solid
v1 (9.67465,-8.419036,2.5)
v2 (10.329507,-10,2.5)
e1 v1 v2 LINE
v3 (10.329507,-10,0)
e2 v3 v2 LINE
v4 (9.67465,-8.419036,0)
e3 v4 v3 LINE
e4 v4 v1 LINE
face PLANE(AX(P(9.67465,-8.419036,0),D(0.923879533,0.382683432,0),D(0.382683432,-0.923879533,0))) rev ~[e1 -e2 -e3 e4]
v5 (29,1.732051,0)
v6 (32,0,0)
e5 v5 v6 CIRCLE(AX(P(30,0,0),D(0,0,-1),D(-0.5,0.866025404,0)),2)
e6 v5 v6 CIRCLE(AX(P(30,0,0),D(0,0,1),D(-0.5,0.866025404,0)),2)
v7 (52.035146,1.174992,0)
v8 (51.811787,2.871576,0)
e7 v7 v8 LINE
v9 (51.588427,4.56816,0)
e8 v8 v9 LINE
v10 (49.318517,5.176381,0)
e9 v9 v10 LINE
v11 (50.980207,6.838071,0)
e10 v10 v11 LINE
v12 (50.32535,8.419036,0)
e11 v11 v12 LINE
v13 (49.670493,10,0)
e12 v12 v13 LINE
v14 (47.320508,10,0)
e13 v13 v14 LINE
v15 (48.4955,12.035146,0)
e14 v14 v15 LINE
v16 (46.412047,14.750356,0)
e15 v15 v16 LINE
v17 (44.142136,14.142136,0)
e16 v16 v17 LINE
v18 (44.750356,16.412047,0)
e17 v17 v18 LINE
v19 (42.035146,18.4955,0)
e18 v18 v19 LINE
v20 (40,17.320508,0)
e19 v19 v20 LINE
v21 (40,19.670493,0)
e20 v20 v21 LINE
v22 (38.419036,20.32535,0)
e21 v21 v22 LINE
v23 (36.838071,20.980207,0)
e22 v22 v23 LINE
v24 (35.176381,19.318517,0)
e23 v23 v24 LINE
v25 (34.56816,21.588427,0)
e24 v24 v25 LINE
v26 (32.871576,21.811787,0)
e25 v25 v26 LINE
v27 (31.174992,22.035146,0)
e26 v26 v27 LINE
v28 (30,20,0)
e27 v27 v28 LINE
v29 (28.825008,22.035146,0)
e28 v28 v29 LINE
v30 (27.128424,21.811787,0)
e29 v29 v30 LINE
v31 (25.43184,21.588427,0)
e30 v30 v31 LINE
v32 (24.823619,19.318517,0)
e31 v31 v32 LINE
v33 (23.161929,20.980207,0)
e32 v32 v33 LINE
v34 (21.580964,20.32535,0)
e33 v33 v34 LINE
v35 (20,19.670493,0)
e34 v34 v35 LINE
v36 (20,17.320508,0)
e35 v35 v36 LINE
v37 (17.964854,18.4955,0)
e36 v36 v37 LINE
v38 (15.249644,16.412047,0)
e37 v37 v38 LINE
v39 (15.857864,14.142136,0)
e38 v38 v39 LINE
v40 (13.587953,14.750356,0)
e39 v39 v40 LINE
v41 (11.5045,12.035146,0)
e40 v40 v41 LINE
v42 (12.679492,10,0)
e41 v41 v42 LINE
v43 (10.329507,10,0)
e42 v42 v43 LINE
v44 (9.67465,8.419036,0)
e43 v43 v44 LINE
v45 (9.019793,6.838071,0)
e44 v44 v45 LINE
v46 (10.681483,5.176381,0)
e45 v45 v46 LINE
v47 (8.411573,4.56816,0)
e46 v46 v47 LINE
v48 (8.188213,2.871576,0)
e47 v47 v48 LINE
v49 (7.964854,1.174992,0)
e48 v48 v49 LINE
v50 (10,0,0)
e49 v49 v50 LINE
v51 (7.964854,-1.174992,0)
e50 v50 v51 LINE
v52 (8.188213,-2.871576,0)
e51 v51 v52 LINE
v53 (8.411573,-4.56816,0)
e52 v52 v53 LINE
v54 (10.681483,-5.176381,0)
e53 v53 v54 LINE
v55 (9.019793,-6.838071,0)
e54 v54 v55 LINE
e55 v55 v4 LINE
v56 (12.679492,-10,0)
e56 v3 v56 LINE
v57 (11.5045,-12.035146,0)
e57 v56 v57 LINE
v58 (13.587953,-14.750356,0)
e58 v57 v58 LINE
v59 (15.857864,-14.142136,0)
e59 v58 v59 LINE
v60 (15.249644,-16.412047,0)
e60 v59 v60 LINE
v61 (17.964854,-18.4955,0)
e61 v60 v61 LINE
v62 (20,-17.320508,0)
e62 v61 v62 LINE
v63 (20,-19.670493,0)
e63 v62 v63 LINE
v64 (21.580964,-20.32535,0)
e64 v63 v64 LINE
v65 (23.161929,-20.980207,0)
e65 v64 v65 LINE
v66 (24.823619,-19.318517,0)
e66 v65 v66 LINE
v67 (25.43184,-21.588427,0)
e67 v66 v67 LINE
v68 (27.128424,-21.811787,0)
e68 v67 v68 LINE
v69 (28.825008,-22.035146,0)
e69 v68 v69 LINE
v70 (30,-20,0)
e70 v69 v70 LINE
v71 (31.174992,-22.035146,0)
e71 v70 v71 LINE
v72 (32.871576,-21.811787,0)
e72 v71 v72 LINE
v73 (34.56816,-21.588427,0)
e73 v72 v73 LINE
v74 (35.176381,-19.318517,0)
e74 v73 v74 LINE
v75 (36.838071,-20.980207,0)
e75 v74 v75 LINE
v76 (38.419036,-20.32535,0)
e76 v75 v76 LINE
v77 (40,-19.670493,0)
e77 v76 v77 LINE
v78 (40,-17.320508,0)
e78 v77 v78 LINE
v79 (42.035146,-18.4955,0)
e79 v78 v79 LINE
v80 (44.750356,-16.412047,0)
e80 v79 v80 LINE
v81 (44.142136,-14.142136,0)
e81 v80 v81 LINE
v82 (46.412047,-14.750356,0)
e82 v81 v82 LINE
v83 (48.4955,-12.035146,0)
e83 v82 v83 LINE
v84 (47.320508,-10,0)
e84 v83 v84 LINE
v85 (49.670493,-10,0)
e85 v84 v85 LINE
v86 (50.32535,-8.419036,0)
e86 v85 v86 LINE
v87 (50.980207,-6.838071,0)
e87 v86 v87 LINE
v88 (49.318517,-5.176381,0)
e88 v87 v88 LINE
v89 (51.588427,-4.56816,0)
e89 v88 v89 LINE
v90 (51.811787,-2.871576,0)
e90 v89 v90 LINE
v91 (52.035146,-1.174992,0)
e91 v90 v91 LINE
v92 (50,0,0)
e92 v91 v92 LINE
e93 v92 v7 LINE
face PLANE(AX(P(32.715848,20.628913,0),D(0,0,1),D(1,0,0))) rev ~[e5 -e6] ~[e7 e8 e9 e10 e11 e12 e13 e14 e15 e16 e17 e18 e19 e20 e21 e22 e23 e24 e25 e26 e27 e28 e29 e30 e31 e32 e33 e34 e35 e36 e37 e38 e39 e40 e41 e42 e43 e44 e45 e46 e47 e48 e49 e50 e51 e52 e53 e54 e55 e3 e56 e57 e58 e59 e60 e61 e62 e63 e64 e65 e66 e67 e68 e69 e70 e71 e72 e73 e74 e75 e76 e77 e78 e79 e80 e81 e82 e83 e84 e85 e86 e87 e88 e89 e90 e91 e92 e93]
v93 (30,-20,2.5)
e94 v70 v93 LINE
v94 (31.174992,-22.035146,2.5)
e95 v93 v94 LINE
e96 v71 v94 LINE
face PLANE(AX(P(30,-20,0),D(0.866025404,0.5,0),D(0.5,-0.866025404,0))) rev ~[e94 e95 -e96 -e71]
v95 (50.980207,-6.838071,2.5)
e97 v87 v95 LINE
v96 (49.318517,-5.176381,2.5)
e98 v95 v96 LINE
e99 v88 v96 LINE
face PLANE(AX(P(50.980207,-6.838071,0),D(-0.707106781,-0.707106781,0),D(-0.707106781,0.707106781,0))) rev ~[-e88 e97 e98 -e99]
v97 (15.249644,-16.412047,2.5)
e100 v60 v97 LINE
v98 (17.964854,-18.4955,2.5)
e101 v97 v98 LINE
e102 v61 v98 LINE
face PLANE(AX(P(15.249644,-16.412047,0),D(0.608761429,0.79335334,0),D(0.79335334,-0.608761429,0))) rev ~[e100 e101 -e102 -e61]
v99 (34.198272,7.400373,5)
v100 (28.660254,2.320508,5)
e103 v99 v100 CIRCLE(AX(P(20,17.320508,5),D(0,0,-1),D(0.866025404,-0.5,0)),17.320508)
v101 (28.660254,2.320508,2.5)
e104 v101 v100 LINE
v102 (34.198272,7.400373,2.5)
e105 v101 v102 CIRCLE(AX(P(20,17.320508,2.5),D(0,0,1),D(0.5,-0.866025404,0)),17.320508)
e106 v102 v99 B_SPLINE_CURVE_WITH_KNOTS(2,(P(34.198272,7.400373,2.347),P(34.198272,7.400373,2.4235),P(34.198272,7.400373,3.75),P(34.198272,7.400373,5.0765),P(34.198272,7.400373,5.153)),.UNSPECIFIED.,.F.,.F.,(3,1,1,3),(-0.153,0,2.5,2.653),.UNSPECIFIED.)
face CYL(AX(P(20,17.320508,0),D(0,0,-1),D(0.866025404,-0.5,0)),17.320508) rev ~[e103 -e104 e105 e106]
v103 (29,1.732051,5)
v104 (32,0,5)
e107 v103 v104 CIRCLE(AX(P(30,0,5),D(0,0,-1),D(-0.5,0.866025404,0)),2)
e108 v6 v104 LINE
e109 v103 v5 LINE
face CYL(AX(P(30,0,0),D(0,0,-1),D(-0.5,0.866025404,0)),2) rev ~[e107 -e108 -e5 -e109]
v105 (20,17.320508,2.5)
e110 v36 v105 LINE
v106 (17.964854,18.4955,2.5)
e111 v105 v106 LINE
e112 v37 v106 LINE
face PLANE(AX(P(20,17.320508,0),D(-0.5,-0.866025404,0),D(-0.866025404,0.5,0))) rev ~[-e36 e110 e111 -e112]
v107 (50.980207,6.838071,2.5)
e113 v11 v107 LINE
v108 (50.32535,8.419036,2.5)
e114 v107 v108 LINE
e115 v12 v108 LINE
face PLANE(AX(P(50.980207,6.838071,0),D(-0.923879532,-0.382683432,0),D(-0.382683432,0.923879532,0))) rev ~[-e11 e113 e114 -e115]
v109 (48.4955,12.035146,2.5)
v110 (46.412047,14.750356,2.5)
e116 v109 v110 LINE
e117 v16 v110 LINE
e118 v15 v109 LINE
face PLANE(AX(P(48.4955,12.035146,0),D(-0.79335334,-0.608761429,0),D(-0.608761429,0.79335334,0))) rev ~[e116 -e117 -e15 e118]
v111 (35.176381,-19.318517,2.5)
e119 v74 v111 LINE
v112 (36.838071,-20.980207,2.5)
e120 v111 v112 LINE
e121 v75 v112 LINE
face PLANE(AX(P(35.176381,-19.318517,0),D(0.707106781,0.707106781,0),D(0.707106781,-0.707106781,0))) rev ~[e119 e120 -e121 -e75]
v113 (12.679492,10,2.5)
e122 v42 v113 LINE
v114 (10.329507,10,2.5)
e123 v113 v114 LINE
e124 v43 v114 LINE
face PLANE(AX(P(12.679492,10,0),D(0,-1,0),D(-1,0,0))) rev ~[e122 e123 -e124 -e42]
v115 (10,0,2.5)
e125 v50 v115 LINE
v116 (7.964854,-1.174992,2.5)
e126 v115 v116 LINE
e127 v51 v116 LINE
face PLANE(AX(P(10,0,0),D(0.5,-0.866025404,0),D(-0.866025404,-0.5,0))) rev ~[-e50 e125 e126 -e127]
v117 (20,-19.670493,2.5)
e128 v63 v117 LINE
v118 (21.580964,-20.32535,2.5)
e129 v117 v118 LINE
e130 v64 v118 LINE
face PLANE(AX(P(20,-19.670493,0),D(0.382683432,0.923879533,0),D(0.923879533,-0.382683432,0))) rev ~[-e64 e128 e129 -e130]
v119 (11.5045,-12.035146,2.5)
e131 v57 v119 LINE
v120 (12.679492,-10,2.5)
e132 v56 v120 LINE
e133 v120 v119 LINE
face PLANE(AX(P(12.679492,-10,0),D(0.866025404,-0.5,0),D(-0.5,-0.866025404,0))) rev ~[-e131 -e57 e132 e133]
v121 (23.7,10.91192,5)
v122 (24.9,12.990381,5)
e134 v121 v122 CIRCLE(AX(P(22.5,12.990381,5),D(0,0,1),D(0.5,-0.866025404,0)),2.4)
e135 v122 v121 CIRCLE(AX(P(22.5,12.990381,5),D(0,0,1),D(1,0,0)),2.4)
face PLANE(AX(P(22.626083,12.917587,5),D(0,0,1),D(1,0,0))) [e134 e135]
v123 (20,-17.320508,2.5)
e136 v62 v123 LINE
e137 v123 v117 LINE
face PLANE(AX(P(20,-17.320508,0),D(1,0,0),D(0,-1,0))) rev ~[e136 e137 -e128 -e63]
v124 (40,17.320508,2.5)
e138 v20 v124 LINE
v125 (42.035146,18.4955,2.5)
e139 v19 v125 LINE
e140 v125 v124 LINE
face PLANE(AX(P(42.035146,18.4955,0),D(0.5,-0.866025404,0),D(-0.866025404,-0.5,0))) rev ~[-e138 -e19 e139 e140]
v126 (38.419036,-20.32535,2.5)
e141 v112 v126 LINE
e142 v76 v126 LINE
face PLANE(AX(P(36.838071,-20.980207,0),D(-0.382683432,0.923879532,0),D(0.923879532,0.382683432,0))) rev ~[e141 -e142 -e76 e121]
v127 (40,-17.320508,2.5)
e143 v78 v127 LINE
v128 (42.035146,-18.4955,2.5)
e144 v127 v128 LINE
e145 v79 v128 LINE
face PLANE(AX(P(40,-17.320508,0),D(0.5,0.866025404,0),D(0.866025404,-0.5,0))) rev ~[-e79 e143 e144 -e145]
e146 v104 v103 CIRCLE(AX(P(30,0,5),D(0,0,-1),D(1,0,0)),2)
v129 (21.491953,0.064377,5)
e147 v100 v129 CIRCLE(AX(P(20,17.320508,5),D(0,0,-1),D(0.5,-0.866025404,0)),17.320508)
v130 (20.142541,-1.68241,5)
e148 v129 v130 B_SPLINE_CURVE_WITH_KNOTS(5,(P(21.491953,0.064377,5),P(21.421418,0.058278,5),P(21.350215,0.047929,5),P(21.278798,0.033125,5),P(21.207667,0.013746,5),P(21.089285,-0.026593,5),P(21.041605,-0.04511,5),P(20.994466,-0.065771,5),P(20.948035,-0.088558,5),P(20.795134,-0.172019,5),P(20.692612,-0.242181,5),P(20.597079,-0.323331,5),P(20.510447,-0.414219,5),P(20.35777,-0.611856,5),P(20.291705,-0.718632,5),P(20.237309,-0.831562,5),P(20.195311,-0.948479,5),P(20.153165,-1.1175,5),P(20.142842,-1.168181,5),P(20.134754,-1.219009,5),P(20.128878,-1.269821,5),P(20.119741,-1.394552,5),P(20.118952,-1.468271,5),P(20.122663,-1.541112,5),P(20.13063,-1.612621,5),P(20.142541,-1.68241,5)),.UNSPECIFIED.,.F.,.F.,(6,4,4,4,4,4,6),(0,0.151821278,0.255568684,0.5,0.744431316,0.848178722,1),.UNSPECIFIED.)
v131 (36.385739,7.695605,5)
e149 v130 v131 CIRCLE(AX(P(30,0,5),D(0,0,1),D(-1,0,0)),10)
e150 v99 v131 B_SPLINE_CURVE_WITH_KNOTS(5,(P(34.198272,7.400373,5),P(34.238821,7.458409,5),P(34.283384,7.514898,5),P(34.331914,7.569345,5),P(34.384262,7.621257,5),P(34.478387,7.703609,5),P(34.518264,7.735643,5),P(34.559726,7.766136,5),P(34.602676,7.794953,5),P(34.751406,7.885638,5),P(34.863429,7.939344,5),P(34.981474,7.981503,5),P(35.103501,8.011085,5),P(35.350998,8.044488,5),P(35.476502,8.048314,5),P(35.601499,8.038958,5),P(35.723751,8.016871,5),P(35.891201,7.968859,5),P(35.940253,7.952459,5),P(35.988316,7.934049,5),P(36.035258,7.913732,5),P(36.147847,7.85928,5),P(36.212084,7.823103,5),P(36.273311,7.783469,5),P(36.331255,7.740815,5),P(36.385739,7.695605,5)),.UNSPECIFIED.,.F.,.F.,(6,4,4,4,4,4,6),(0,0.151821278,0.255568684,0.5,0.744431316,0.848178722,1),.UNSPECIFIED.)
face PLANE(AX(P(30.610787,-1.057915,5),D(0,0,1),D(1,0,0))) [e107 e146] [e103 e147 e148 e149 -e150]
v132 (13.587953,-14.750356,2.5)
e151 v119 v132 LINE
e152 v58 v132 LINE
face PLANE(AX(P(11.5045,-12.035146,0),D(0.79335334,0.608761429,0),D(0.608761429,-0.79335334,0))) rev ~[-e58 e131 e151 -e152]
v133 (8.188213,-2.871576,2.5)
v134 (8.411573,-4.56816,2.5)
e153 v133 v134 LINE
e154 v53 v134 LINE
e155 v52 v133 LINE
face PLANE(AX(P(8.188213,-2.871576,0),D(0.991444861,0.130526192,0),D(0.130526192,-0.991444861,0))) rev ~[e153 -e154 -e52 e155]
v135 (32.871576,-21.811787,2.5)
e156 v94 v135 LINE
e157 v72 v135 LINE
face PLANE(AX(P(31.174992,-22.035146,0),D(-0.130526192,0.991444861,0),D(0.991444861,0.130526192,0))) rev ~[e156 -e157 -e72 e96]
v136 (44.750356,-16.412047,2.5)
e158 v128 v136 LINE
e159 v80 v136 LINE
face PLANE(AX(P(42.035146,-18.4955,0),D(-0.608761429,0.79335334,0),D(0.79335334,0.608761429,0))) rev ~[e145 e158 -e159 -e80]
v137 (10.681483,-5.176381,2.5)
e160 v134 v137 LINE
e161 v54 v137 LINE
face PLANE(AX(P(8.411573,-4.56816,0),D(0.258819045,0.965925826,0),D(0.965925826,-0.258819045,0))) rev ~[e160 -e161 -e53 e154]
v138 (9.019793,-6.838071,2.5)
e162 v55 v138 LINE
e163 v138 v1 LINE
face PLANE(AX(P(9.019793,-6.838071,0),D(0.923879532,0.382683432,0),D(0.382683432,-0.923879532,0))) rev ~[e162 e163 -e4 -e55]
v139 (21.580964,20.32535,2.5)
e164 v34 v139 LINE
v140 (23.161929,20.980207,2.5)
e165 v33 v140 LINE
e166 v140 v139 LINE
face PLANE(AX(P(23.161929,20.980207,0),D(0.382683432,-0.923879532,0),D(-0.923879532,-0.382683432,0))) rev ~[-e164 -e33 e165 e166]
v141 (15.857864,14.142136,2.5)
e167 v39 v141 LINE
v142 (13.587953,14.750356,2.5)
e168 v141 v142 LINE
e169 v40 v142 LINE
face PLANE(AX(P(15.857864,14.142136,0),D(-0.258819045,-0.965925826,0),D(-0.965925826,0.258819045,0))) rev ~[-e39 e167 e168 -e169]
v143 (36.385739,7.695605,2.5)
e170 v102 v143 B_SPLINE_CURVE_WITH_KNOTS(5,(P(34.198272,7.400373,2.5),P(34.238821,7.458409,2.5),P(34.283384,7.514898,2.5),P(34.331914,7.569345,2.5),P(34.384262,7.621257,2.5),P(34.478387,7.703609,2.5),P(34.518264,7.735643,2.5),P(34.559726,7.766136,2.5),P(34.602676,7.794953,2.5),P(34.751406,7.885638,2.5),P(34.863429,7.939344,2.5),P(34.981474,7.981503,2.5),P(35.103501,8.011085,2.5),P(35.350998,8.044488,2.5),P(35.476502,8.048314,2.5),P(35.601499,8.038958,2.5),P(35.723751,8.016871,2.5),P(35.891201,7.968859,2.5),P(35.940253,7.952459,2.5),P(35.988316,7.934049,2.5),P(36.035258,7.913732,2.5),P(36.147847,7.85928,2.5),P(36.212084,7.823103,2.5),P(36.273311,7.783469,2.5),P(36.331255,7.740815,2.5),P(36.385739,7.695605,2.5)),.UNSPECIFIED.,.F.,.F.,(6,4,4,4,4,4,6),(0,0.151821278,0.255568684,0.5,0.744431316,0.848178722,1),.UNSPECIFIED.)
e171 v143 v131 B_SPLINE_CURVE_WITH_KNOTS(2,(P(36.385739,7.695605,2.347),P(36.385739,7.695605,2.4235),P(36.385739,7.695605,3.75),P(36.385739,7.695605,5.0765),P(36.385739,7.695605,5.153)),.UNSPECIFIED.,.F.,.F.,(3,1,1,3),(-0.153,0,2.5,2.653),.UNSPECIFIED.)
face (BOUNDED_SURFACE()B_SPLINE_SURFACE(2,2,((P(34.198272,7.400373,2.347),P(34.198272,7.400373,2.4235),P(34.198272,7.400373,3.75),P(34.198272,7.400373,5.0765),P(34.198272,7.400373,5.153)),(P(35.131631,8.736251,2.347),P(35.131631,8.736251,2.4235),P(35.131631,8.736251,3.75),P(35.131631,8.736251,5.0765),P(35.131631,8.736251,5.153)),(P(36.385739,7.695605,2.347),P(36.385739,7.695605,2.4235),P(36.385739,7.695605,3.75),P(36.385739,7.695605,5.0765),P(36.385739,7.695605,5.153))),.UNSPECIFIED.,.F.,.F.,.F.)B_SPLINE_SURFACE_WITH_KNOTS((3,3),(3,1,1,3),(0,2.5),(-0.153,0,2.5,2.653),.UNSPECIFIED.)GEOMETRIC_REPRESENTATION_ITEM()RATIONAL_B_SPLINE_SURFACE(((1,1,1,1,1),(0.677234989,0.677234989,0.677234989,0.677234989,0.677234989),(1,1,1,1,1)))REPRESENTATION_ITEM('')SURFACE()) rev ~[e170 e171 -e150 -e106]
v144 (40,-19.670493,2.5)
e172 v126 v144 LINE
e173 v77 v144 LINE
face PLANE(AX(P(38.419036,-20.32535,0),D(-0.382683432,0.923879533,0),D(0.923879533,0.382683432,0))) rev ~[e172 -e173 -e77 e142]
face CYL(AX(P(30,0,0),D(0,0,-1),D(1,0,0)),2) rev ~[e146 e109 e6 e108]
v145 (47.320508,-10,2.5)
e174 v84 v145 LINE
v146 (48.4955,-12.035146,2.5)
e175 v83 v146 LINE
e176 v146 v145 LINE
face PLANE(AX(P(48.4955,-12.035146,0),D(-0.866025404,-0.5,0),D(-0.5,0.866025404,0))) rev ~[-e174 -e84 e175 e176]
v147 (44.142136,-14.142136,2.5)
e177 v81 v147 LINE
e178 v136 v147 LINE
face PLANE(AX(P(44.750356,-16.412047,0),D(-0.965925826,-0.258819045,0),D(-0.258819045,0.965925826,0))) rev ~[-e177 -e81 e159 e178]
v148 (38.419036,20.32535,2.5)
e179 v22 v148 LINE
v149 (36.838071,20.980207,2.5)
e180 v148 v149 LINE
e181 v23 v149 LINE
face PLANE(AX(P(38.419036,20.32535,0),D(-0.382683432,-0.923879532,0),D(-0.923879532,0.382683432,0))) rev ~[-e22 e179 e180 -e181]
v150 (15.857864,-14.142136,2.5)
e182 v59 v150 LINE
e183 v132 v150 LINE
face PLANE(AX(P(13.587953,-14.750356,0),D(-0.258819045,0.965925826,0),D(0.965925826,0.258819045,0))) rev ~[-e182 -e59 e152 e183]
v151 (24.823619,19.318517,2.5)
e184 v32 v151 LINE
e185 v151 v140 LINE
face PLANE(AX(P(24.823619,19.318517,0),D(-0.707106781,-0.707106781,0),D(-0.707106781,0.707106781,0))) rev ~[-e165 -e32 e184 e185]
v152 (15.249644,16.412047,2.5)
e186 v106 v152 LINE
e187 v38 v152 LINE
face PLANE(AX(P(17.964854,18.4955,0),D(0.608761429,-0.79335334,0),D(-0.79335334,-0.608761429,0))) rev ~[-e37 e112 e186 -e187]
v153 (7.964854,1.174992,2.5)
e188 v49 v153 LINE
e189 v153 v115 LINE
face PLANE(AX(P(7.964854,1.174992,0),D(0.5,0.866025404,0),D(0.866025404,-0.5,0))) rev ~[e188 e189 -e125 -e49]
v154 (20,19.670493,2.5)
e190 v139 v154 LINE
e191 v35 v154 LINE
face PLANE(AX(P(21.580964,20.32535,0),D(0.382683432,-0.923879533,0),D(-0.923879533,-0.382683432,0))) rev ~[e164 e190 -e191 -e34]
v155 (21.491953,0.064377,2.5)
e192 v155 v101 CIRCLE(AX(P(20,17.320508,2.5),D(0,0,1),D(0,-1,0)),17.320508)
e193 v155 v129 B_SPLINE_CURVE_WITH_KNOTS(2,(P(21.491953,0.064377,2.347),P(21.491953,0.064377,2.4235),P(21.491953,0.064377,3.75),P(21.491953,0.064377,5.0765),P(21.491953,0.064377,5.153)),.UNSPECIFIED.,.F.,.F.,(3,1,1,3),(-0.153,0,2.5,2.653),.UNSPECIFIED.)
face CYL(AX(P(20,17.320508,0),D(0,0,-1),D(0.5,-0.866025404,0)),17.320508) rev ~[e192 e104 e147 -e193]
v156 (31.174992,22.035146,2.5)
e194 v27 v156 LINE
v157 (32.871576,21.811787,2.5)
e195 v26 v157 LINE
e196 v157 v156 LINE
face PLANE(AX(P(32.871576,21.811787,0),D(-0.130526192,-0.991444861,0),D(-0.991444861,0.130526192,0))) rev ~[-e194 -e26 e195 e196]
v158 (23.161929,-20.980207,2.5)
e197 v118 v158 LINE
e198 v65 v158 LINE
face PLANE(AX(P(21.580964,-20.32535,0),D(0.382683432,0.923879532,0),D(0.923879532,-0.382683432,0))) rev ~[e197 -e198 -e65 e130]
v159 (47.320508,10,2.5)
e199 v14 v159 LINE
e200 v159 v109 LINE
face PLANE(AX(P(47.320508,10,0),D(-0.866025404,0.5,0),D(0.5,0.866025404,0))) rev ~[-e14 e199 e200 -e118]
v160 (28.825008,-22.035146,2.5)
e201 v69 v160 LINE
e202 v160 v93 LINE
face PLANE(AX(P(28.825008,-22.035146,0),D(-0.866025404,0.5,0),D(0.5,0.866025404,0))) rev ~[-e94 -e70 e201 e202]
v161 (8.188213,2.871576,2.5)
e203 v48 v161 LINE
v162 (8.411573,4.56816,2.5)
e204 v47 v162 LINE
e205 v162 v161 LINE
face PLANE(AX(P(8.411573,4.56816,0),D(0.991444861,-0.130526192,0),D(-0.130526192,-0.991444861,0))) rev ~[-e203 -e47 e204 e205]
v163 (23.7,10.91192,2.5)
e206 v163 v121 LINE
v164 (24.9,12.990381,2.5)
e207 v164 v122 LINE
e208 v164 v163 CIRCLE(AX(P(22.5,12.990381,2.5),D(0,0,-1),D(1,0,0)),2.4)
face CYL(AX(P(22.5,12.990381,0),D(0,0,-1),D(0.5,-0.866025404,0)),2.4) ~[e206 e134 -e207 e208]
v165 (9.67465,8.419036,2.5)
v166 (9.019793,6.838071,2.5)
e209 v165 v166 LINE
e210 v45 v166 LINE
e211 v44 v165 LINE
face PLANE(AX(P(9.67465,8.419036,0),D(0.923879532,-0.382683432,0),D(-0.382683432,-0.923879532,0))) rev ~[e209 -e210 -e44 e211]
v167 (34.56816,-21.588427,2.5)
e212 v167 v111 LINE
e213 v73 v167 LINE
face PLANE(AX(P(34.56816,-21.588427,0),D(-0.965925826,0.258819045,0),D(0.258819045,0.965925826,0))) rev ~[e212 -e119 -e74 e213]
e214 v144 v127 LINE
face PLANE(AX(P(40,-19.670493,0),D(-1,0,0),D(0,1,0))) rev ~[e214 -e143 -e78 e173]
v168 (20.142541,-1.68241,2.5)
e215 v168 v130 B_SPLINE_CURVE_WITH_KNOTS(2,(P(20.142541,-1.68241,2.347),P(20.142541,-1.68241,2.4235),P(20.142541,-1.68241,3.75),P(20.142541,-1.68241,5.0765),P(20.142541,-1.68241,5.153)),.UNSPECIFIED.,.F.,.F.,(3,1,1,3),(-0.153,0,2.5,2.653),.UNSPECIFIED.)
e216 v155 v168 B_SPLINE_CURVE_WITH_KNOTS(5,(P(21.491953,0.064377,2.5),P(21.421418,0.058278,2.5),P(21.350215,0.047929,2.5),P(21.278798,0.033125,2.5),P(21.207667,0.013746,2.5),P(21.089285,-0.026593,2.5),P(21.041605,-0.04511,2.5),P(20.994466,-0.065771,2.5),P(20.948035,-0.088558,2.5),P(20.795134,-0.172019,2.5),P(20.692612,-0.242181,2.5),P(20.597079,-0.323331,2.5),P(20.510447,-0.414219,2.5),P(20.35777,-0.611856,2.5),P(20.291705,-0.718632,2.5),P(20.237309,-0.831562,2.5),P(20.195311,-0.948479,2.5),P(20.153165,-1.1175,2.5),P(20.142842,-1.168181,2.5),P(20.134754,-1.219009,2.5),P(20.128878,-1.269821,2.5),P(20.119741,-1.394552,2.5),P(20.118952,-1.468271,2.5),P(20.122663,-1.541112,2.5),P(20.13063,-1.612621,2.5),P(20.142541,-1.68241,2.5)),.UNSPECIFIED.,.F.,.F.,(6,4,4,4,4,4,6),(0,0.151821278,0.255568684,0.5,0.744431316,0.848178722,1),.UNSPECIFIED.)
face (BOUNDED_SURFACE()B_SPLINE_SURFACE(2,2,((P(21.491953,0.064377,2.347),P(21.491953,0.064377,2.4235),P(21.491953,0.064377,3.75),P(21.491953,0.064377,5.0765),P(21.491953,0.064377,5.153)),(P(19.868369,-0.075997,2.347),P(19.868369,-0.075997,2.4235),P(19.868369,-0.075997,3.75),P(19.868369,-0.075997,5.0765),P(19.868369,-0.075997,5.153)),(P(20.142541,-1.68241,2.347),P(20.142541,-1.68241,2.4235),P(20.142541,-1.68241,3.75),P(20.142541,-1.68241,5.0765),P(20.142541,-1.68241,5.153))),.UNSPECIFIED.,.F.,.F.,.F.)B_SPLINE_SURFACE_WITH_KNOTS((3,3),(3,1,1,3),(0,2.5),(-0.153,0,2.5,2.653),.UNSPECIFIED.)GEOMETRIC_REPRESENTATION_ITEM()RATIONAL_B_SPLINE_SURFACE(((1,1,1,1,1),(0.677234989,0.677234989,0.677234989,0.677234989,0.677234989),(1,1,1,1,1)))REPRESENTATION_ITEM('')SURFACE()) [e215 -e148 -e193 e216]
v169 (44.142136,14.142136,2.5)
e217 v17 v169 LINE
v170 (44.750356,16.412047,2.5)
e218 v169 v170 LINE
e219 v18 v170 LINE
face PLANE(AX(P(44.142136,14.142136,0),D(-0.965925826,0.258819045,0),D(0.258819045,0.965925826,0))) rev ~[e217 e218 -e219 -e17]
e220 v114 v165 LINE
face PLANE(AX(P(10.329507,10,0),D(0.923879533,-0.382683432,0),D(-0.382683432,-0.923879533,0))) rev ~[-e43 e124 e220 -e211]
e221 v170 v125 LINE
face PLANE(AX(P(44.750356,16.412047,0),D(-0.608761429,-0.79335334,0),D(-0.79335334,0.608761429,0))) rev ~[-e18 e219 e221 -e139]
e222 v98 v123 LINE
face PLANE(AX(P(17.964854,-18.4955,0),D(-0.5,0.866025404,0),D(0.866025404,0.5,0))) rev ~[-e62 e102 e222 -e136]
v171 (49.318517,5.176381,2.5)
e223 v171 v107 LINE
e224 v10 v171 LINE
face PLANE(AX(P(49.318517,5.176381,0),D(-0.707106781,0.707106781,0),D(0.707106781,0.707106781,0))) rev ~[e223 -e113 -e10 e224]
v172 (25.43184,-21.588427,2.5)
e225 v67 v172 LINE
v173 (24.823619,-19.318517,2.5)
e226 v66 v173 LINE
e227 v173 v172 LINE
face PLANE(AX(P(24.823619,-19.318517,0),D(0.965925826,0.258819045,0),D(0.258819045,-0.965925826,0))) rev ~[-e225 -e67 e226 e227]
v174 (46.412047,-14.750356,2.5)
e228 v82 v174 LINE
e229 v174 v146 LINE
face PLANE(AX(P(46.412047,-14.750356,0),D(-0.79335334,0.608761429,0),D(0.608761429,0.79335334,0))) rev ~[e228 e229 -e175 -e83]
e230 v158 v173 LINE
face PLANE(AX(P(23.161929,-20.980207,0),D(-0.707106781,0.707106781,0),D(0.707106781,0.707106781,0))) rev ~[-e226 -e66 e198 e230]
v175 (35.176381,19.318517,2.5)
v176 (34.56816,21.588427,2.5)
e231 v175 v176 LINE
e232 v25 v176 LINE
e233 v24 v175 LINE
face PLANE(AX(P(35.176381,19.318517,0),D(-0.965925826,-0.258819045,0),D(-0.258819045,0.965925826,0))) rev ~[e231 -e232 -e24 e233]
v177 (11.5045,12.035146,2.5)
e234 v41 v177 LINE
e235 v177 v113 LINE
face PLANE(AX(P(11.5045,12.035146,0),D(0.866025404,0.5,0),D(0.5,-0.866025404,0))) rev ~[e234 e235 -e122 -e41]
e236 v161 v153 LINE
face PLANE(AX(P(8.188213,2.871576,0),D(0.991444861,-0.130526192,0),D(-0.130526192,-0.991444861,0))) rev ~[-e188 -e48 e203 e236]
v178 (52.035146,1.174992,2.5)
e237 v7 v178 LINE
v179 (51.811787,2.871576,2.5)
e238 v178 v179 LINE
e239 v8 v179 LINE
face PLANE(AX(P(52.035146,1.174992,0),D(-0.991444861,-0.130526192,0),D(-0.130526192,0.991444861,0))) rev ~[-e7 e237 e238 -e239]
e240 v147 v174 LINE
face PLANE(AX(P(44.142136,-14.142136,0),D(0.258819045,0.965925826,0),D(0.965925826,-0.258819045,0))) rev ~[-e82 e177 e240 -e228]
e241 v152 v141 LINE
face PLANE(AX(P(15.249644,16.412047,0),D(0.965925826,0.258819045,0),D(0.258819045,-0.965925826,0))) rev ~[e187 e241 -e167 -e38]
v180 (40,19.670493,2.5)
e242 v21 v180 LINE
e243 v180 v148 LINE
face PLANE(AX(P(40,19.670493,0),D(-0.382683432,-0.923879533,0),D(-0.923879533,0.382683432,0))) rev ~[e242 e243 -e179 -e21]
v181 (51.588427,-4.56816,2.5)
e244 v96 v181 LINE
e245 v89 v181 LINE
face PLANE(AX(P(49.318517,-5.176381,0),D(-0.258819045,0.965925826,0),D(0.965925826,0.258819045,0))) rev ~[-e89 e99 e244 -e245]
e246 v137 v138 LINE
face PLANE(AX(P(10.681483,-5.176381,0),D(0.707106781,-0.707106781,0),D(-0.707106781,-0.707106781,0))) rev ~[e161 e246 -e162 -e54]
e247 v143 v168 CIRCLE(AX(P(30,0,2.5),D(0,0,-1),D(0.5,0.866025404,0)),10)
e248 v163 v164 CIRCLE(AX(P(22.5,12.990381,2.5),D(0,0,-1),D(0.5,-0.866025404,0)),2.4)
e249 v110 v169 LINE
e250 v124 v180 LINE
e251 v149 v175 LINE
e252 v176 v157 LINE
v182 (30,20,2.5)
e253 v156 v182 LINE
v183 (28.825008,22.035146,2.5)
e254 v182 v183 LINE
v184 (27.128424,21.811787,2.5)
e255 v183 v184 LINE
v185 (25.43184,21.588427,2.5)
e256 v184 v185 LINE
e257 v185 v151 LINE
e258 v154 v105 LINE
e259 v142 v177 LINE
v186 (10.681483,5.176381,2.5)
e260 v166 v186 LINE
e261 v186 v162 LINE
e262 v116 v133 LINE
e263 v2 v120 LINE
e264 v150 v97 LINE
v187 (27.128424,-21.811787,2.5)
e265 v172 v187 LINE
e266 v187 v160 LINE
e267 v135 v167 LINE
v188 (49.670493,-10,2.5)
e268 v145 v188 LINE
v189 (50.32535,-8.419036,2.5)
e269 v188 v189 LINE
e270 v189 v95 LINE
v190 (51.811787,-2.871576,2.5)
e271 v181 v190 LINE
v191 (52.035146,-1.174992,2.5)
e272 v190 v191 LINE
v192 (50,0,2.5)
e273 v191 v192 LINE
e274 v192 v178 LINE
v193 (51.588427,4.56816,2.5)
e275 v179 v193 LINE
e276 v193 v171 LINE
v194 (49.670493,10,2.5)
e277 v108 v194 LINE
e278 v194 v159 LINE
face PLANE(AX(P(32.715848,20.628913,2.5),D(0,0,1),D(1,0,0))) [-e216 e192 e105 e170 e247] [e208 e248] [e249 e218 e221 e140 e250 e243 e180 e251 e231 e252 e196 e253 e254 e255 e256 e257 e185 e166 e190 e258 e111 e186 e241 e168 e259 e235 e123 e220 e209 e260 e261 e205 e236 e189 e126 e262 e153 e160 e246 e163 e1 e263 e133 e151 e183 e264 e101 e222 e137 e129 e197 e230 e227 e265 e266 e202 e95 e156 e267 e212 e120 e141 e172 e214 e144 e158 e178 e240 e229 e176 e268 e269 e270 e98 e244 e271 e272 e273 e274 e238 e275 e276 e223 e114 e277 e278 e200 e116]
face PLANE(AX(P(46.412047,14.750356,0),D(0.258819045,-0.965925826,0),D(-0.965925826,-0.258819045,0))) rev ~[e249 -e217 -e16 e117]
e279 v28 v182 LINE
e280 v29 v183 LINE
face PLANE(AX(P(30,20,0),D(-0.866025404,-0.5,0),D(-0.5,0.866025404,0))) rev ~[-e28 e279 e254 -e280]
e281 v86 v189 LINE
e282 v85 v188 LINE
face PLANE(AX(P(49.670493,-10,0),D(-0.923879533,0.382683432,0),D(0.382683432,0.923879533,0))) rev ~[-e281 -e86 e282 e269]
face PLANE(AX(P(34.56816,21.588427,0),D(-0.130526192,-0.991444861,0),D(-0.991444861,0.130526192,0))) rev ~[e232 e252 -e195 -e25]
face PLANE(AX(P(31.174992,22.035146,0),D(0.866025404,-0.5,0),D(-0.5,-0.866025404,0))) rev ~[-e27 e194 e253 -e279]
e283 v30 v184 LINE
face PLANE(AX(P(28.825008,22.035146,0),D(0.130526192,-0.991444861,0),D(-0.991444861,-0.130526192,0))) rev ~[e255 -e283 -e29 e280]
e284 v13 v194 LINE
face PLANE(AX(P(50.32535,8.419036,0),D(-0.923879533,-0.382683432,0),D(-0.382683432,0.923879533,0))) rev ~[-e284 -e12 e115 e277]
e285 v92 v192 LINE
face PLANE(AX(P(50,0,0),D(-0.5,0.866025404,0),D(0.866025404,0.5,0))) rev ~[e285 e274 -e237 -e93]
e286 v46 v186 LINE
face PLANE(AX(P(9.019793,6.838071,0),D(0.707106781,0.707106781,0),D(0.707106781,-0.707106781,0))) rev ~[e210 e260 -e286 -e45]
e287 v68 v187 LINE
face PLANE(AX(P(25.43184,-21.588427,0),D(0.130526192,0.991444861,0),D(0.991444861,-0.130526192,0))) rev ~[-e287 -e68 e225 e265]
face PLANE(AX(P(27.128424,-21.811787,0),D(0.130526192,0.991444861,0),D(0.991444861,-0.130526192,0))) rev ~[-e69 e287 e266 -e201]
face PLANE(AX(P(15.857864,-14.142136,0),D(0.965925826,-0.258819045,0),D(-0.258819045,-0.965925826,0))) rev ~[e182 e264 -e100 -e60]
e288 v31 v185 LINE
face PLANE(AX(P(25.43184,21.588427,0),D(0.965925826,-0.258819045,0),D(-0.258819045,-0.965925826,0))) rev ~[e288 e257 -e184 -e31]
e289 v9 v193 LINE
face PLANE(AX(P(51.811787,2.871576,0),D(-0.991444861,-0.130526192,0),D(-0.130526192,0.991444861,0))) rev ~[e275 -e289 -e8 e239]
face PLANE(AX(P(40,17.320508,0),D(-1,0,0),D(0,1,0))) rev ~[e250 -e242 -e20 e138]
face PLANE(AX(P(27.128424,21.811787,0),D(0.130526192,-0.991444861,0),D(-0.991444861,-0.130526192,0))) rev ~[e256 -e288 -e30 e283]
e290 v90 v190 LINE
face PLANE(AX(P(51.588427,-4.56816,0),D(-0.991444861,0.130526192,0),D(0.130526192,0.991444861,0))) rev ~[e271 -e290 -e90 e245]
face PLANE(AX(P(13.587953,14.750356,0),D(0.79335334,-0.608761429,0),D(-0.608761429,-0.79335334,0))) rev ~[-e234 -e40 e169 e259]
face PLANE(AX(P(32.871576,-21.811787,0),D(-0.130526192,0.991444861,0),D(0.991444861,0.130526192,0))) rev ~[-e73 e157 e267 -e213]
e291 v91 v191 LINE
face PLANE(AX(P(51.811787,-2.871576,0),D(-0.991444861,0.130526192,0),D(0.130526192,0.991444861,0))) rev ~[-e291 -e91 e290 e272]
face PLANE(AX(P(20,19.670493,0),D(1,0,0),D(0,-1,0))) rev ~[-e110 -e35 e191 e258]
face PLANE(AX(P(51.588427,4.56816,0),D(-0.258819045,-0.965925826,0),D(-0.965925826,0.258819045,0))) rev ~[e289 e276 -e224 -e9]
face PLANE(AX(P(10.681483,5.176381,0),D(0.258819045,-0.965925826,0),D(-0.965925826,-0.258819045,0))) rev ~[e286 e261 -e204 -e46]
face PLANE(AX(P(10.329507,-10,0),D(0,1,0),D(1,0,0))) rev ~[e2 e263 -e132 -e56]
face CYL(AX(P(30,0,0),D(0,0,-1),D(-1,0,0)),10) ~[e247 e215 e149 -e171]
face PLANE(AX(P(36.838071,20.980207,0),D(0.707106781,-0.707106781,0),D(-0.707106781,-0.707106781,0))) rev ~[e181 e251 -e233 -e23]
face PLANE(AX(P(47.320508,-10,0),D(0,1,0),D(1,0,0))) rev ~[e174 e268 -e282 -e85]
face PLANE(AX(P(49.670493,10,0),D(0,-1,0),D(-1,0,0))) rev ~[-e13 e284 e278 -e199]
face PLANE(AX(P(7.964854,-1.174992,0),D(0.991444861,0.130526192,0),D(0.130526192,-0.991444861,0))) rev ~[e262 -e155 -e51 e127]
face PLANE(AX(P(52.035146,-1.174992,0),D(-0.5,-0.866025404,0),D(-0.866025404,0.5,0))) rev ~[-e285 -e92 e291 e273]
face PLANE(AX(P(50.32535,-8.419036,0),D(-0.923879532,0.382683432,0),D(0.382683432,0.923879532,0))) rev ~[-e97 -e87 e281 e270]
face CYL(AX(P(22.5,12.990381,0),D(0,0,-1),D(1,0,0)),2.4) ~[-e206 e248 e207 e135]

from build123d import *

# Parameters (mm, degrees)
F0_R     = 20
F2_DEPTH = 2.5
F3_DEPTH = 5
F4_DEPTH = 2.5
F5_R     = 1.5


with BuildPart() as f2:
    # F0 (on Top) → F2 (new body)
    with BuildSketch(Plane.XY):
        with Locations((30, 0)):
            Circle(F0_R)
        with BuildLine():
            ThreePointArc((20, 0), (24.4828773608, 0.5901820009), (28.6602540378, 2.3205080757))
            ThreePointArc((28.6602540378, 2.3205080757), (32.2474487139, 5.0730593618), (35, 8.6602540378))
            ThreePointArc((35, 8.6602540378), (35, -8.6602540378), (20, 0))
        make_face(mode=Mode.SUBTRACT)
        with BuildLine():
            ThreePointArc((24.9, 12.9903810568), (24.5784609691, 11.7903810568), (23.7, 10.9119200877))
            ThreePointArc((23.7, 10.9119200877), (20.4215390309, 14.1903810568), (24.9, 12.9903810568))
        make_face(mode=Mode.SUBTRACT)
    extrude(amount=F2_DEPTH)

    # F0 (on Top) → F3 (join)
    with BuildSketch(Plane.XY):
        with BuildLine():
            ThreePointArc((24.9, 12.9903810568), (20.4215390309, 14.1903810568), (23.7, 10.9119200877))
            ThreePointArc((23.7, 10.9119200877), (24.5784609691, 11.7903810568), (24.9, 12.9903810568))
        make_face()
        with BuildLine():
            ThreePointArc((35, 8.6602540378), (32.2474487139, 5.0730593618), (28.6602540378, 2.3205080757))
            ThreePointArc((28.6602540378, 2.3205080757), (24.4828773608, 0.5901820009), (20, 0))
            ThreePointArc((20, 0), (35, -8.6602540378), (35, 8.6602540378))
        make_face()
        with BuildLine():
            ThreePointArc((32, 0), (29, -1.7320508076), (29, 1.7320508076))
            ThreePointArc((29, 1.7320508076), (31, 1.7320508076), (32, 0))
        make_face(mode=Mode.SUBTRACT)
    extrude(amount=F3_DEPTH)

    # F1 (on Top) → F4 (join)
    with BuildSketch(Plane.XY):
        with BuildLine():
            Line((31.1749923535, 22.0351464548), (30, 20))
            ThreePointArc((30, 20), (32.6105238444, 19.8288972275), (35.1763809021, 19.3185165258))
            Line((35.1763809021, 19.3185165258), (34.5681601042, 21.5884274457))
            Line((34.5681601042, 21.5884274457), (32.8715762288, 21.8117869502))
            Line((32.8715762288, 21.8117869502), (31.1749923535, 22.0351464548))
        make_face()
        with BuildLine():
            Line((7.9648535452, 1.1749923535), (10, 0))
            Line((10, 0), (7.9648535452, -1.1749923535))
            Line((7.9648535452, -1.1749923535), (8.1882130498, -2.8715762288))
            Line((8.1882130498, -2.8715762288), (8.4115725543, -4.5681601042))
            Line((8.4115725543, -4.5681601042), (10.6814834742, -5.1763809021))
            Line((10.6814834742, -5.1763809021), (9.0197933522, -6.8380710241))
            Line((9.0197933522, -6.8380710241), (9.6746502848, -8.419035512))
            Line((9.6746502848, -8.419035512), (10.3295072173, -10))
            Line((10.3295072173, -10), (12.6794919243, -10))
            Line((12.6794919243, -10), (11.5044995708, -12.0351464548))
            Line((11.5044995708, -12.0351464548), (12.5462265136, -13.3927514382))
            Line((12.5462265136, -13.3927514382), (13.5879534564, -14.7503564216))
            Line((13.5879534564, -14.7503564216), (15.8578643763, -14.1421356237))
            Line((15.8578643763, -14.1421356237), (15.2496435784, -16.4120465436))
            Line((15.2496435784, -16.4120465436), (16.6072485618, -17.4537734864))
            Line((16.6072485618, -17.4537734864), (17.9648535452, -18.4955004292))
            Line((17.9648535452, -18.4955004292), (20, -17.3205080757))
            Line((20, -17.3205080757), (20, -19.6704927827))
            Line((20, -19.6704927827), (21.580964488, -20.3253497152))
            Line((21.580964488, -20.3253497152), (23.1619289759, -20.9802066478))
            Line((23.1619289759, -20.9802066478), (24.8236190979, -19.3185165258))
            Line((24.8236190979, -19.3185165258), (25.4318398958, -21.5884274457))
            Line((25.4318398958, -21.5884274457), (27.1284237712, -21.8117869502))
            Line((27.1284237712, -21.8117869502), (28.8250076465, -22.0351464548))
            Line((28.8250076465, -22.0351464548), (30, -20))
            Line((30, -20), (31.1749923535, -22.0351464548))
            Line((31.1749923535, -22.0351464548), (32.8715762288, -21.8117869502))
            Line((32.8715762288, -21.8117869502), (34.5681601042, -21.5884274457))
            Line((34.5681601042, -21.5884274457), (35.1763809021, -19.3185165258))
            Line((35.1763809021, -19.3185165258), (36.8380710241, -20.9802066478))
            Line((36.8380710241, -20.9802066478), (38.419035512, -20.3253497152))
            Line((38.419035512, -20.3253497152), (40, -19.6704927827))
            Line((40, -19.6704927827), (40, -17.3205080757))
            Line((40, -17.3205080757), (42.0351464548, -18.4955004292))
            Line((42.0351464548, -18.4955004292), (43.3927514382, -17.4537734864))
            Line((43.3927514382, -17.4537734864), (44.7503564216, -16.4120465436))
            Line((44.7503564216, -16.4120465436), (44.1421356237, -14.1421356237))
            Line((44.1421356237, -14.1421356237), (46.4120465436, -14.7503564216))
            Line((46.4120465436, -14.7503564216), (47.4537734864, -13.3927514382))
            Line((47.4537734864, -13.3927514382), (48.4955004292, -12.0351464548))
            Line((48.4955004292, -12.0351464548), (47.3205080757, -10))
            Line((47.3205080757, -10), (49.6704927827, -10))
            Line((49.6704927827, -10), (50.3253497152, -8.419035512))
            Line((50.3253497152, -8.419035512), (50.9802066478, -6.8380710241))
            Line((50.9802066478, -6.8380710241), (49.3185165258, -5.1763809021))
            Line((49.3185165258, -5.1763809021), (51.5884274457, -4.5681601042))
            Line((51.5884274457, -4.5681601042), (51.8117869502, -2.8715762288))
            Line((51.8117869502, -2.8715762288), (52.0351464548, -1.1749923535))
            Line((52.0351464548, -1.1749923535), (50, 0))
            Line((50, 0), (52.0351464548, 1.1749923535))
            Line((52.0351464548, 1.1749923535), (51.8117869502, 2.8715762288))
            Line((51.8117869502, 2.8715762288), (51.5884274457, 4.5681601042))
            Line((51.5884274457, 4.5681601042), (49.3185165258, 5.1763809021))
            Line((49.3185165258, 5.1763809021), (50.9802066478, 6.8380710241))
            Line((50.9802066478, 6.8380710241), (50.3253497152, 8.419035512))
            Line((50.3253497152, 8.419035512), (49.6704927827, 10))
            Line((49.6704927827, 10), (47.3205080757, 10))
            Line((47.3205080757, 10), (48.4955004292, 12.0351464548))
            Line((48.4955004292, 12.0351464548), (47.4537734864, 13.3927514382))
            Line((47.4537734864, 13.3927514382), (46.4120465436, 14.7503564216))
            Line((46.4120465436, 14.7503564216), (44.1421356237, 14.1421356237))
            Line((44.1421356237, 14.1421356237), (44.7503564216, 16.4120465436))
            Line((44.7503564216, 16.4120465436), (43.3927514382, 17.4537734864))
            Line((43.3927514382, 17.4537734864), (42.0351464548, 18.4955004292))
            Line((42.0351464548, 18.4955004292), (40, 17.3205080757))
            Line((40, 17.3205080757), (40, 19.6704927827))
            Line((40, 19.6704927827), (38.419035512, 20.3253497152))
            Line((38.419035512, 20.3253497152), (36.8380710241, 20.9802066478))
            Line((36.8380710241, 20.9802066478), (35.1763809021, 19.3185165258))
            ThreePointArc((35.1763809021, 19.3185165258), (32.6105238444, 19.8288972275), (30, 20))
            Line((30, 20), (28.8250076465, 22.0351464548))
            Line((28.8250076465, 22.0351464548), (27.1284237712, 21.8117869502))
            Line((27.1284237712, 21.8117869502), (25.4318398958, 21.5884274457))
            Line((25.4318398958, 21.5884274457), (24.8236190979, 19.3185165258))
            Line((24.8236190979, 19.3185165258), (23.1619289759, 20.9802066478))
            Line((23.1619289759, 20.9802066478), (21.580964488, 20.3253497152))
            Line((21.580964488, 20.3253497152), (20, 19.6704927827))
            Line((20, 19.6704927827), (20, 17.3205080757))
            Line((20, 17.3205080757), (17.9648535452, 18.4955004292))
            Line((17.9648535452, 18.4955004292), (16.6072485618, 17.4537734864))
            Line((16.6072485618, 17.4537734864), (15.2496435784, 16.4120465436))
            Line((15.2496435784, 16.4120465436), (15.8578643763, 14.1421356237))
            Line((15.8578643763, 14.1421356237), (13.5879534564, 14.7503564216))
            Line((13.5879534564, 14.7503564216), (12.5462265136, 13.3927514382))
            Line((12.5462265136, 13.3927514382), (11.5044995708, 12.0351464548))
            Line((11.5044995708, 12.0351464548), (12.6794919243, 10))
            Line((12.6794919243, 10), (10.3295072173, 10))
            Line((10.3295072173, 10), (9.6746502848, 8.419035512))
            Line((9.6746502848, 8.419035512), (9.0197933522, 6.8380710241))
            Line((9.0197933522, 6.8380710241), (10.6814834742, 5.1763809021))
            Line((10.6814834742, 5.1763809021), (8.4115725543, 4.5681601042))
            Line((8.4115725543, 4.5681601042), (8.1882130498, 2.8715762288))
            Line((8.1882130498, 2.8715762288), (7.9648535452, 1.1749923535))
        make_face()
        with BuildLine():
            ThreePointArc((32, 0), (30, -2), (28, 0))
            ThreePointArc((28, 0), (30, 2), (32, 0))
        make_face(mode=Mode.SUBTRACT)
    extrude(amount=F4_DEPTH)

    # F5
    f5_edges = [f2.edges().sort_by_distance(p)[0] for p in [
        (20, 0, 3.75),
        (35, 8.660254, 3.75),
    ]]
    fillet(f5_edges, radius=F5_R)


solid = f2.part
